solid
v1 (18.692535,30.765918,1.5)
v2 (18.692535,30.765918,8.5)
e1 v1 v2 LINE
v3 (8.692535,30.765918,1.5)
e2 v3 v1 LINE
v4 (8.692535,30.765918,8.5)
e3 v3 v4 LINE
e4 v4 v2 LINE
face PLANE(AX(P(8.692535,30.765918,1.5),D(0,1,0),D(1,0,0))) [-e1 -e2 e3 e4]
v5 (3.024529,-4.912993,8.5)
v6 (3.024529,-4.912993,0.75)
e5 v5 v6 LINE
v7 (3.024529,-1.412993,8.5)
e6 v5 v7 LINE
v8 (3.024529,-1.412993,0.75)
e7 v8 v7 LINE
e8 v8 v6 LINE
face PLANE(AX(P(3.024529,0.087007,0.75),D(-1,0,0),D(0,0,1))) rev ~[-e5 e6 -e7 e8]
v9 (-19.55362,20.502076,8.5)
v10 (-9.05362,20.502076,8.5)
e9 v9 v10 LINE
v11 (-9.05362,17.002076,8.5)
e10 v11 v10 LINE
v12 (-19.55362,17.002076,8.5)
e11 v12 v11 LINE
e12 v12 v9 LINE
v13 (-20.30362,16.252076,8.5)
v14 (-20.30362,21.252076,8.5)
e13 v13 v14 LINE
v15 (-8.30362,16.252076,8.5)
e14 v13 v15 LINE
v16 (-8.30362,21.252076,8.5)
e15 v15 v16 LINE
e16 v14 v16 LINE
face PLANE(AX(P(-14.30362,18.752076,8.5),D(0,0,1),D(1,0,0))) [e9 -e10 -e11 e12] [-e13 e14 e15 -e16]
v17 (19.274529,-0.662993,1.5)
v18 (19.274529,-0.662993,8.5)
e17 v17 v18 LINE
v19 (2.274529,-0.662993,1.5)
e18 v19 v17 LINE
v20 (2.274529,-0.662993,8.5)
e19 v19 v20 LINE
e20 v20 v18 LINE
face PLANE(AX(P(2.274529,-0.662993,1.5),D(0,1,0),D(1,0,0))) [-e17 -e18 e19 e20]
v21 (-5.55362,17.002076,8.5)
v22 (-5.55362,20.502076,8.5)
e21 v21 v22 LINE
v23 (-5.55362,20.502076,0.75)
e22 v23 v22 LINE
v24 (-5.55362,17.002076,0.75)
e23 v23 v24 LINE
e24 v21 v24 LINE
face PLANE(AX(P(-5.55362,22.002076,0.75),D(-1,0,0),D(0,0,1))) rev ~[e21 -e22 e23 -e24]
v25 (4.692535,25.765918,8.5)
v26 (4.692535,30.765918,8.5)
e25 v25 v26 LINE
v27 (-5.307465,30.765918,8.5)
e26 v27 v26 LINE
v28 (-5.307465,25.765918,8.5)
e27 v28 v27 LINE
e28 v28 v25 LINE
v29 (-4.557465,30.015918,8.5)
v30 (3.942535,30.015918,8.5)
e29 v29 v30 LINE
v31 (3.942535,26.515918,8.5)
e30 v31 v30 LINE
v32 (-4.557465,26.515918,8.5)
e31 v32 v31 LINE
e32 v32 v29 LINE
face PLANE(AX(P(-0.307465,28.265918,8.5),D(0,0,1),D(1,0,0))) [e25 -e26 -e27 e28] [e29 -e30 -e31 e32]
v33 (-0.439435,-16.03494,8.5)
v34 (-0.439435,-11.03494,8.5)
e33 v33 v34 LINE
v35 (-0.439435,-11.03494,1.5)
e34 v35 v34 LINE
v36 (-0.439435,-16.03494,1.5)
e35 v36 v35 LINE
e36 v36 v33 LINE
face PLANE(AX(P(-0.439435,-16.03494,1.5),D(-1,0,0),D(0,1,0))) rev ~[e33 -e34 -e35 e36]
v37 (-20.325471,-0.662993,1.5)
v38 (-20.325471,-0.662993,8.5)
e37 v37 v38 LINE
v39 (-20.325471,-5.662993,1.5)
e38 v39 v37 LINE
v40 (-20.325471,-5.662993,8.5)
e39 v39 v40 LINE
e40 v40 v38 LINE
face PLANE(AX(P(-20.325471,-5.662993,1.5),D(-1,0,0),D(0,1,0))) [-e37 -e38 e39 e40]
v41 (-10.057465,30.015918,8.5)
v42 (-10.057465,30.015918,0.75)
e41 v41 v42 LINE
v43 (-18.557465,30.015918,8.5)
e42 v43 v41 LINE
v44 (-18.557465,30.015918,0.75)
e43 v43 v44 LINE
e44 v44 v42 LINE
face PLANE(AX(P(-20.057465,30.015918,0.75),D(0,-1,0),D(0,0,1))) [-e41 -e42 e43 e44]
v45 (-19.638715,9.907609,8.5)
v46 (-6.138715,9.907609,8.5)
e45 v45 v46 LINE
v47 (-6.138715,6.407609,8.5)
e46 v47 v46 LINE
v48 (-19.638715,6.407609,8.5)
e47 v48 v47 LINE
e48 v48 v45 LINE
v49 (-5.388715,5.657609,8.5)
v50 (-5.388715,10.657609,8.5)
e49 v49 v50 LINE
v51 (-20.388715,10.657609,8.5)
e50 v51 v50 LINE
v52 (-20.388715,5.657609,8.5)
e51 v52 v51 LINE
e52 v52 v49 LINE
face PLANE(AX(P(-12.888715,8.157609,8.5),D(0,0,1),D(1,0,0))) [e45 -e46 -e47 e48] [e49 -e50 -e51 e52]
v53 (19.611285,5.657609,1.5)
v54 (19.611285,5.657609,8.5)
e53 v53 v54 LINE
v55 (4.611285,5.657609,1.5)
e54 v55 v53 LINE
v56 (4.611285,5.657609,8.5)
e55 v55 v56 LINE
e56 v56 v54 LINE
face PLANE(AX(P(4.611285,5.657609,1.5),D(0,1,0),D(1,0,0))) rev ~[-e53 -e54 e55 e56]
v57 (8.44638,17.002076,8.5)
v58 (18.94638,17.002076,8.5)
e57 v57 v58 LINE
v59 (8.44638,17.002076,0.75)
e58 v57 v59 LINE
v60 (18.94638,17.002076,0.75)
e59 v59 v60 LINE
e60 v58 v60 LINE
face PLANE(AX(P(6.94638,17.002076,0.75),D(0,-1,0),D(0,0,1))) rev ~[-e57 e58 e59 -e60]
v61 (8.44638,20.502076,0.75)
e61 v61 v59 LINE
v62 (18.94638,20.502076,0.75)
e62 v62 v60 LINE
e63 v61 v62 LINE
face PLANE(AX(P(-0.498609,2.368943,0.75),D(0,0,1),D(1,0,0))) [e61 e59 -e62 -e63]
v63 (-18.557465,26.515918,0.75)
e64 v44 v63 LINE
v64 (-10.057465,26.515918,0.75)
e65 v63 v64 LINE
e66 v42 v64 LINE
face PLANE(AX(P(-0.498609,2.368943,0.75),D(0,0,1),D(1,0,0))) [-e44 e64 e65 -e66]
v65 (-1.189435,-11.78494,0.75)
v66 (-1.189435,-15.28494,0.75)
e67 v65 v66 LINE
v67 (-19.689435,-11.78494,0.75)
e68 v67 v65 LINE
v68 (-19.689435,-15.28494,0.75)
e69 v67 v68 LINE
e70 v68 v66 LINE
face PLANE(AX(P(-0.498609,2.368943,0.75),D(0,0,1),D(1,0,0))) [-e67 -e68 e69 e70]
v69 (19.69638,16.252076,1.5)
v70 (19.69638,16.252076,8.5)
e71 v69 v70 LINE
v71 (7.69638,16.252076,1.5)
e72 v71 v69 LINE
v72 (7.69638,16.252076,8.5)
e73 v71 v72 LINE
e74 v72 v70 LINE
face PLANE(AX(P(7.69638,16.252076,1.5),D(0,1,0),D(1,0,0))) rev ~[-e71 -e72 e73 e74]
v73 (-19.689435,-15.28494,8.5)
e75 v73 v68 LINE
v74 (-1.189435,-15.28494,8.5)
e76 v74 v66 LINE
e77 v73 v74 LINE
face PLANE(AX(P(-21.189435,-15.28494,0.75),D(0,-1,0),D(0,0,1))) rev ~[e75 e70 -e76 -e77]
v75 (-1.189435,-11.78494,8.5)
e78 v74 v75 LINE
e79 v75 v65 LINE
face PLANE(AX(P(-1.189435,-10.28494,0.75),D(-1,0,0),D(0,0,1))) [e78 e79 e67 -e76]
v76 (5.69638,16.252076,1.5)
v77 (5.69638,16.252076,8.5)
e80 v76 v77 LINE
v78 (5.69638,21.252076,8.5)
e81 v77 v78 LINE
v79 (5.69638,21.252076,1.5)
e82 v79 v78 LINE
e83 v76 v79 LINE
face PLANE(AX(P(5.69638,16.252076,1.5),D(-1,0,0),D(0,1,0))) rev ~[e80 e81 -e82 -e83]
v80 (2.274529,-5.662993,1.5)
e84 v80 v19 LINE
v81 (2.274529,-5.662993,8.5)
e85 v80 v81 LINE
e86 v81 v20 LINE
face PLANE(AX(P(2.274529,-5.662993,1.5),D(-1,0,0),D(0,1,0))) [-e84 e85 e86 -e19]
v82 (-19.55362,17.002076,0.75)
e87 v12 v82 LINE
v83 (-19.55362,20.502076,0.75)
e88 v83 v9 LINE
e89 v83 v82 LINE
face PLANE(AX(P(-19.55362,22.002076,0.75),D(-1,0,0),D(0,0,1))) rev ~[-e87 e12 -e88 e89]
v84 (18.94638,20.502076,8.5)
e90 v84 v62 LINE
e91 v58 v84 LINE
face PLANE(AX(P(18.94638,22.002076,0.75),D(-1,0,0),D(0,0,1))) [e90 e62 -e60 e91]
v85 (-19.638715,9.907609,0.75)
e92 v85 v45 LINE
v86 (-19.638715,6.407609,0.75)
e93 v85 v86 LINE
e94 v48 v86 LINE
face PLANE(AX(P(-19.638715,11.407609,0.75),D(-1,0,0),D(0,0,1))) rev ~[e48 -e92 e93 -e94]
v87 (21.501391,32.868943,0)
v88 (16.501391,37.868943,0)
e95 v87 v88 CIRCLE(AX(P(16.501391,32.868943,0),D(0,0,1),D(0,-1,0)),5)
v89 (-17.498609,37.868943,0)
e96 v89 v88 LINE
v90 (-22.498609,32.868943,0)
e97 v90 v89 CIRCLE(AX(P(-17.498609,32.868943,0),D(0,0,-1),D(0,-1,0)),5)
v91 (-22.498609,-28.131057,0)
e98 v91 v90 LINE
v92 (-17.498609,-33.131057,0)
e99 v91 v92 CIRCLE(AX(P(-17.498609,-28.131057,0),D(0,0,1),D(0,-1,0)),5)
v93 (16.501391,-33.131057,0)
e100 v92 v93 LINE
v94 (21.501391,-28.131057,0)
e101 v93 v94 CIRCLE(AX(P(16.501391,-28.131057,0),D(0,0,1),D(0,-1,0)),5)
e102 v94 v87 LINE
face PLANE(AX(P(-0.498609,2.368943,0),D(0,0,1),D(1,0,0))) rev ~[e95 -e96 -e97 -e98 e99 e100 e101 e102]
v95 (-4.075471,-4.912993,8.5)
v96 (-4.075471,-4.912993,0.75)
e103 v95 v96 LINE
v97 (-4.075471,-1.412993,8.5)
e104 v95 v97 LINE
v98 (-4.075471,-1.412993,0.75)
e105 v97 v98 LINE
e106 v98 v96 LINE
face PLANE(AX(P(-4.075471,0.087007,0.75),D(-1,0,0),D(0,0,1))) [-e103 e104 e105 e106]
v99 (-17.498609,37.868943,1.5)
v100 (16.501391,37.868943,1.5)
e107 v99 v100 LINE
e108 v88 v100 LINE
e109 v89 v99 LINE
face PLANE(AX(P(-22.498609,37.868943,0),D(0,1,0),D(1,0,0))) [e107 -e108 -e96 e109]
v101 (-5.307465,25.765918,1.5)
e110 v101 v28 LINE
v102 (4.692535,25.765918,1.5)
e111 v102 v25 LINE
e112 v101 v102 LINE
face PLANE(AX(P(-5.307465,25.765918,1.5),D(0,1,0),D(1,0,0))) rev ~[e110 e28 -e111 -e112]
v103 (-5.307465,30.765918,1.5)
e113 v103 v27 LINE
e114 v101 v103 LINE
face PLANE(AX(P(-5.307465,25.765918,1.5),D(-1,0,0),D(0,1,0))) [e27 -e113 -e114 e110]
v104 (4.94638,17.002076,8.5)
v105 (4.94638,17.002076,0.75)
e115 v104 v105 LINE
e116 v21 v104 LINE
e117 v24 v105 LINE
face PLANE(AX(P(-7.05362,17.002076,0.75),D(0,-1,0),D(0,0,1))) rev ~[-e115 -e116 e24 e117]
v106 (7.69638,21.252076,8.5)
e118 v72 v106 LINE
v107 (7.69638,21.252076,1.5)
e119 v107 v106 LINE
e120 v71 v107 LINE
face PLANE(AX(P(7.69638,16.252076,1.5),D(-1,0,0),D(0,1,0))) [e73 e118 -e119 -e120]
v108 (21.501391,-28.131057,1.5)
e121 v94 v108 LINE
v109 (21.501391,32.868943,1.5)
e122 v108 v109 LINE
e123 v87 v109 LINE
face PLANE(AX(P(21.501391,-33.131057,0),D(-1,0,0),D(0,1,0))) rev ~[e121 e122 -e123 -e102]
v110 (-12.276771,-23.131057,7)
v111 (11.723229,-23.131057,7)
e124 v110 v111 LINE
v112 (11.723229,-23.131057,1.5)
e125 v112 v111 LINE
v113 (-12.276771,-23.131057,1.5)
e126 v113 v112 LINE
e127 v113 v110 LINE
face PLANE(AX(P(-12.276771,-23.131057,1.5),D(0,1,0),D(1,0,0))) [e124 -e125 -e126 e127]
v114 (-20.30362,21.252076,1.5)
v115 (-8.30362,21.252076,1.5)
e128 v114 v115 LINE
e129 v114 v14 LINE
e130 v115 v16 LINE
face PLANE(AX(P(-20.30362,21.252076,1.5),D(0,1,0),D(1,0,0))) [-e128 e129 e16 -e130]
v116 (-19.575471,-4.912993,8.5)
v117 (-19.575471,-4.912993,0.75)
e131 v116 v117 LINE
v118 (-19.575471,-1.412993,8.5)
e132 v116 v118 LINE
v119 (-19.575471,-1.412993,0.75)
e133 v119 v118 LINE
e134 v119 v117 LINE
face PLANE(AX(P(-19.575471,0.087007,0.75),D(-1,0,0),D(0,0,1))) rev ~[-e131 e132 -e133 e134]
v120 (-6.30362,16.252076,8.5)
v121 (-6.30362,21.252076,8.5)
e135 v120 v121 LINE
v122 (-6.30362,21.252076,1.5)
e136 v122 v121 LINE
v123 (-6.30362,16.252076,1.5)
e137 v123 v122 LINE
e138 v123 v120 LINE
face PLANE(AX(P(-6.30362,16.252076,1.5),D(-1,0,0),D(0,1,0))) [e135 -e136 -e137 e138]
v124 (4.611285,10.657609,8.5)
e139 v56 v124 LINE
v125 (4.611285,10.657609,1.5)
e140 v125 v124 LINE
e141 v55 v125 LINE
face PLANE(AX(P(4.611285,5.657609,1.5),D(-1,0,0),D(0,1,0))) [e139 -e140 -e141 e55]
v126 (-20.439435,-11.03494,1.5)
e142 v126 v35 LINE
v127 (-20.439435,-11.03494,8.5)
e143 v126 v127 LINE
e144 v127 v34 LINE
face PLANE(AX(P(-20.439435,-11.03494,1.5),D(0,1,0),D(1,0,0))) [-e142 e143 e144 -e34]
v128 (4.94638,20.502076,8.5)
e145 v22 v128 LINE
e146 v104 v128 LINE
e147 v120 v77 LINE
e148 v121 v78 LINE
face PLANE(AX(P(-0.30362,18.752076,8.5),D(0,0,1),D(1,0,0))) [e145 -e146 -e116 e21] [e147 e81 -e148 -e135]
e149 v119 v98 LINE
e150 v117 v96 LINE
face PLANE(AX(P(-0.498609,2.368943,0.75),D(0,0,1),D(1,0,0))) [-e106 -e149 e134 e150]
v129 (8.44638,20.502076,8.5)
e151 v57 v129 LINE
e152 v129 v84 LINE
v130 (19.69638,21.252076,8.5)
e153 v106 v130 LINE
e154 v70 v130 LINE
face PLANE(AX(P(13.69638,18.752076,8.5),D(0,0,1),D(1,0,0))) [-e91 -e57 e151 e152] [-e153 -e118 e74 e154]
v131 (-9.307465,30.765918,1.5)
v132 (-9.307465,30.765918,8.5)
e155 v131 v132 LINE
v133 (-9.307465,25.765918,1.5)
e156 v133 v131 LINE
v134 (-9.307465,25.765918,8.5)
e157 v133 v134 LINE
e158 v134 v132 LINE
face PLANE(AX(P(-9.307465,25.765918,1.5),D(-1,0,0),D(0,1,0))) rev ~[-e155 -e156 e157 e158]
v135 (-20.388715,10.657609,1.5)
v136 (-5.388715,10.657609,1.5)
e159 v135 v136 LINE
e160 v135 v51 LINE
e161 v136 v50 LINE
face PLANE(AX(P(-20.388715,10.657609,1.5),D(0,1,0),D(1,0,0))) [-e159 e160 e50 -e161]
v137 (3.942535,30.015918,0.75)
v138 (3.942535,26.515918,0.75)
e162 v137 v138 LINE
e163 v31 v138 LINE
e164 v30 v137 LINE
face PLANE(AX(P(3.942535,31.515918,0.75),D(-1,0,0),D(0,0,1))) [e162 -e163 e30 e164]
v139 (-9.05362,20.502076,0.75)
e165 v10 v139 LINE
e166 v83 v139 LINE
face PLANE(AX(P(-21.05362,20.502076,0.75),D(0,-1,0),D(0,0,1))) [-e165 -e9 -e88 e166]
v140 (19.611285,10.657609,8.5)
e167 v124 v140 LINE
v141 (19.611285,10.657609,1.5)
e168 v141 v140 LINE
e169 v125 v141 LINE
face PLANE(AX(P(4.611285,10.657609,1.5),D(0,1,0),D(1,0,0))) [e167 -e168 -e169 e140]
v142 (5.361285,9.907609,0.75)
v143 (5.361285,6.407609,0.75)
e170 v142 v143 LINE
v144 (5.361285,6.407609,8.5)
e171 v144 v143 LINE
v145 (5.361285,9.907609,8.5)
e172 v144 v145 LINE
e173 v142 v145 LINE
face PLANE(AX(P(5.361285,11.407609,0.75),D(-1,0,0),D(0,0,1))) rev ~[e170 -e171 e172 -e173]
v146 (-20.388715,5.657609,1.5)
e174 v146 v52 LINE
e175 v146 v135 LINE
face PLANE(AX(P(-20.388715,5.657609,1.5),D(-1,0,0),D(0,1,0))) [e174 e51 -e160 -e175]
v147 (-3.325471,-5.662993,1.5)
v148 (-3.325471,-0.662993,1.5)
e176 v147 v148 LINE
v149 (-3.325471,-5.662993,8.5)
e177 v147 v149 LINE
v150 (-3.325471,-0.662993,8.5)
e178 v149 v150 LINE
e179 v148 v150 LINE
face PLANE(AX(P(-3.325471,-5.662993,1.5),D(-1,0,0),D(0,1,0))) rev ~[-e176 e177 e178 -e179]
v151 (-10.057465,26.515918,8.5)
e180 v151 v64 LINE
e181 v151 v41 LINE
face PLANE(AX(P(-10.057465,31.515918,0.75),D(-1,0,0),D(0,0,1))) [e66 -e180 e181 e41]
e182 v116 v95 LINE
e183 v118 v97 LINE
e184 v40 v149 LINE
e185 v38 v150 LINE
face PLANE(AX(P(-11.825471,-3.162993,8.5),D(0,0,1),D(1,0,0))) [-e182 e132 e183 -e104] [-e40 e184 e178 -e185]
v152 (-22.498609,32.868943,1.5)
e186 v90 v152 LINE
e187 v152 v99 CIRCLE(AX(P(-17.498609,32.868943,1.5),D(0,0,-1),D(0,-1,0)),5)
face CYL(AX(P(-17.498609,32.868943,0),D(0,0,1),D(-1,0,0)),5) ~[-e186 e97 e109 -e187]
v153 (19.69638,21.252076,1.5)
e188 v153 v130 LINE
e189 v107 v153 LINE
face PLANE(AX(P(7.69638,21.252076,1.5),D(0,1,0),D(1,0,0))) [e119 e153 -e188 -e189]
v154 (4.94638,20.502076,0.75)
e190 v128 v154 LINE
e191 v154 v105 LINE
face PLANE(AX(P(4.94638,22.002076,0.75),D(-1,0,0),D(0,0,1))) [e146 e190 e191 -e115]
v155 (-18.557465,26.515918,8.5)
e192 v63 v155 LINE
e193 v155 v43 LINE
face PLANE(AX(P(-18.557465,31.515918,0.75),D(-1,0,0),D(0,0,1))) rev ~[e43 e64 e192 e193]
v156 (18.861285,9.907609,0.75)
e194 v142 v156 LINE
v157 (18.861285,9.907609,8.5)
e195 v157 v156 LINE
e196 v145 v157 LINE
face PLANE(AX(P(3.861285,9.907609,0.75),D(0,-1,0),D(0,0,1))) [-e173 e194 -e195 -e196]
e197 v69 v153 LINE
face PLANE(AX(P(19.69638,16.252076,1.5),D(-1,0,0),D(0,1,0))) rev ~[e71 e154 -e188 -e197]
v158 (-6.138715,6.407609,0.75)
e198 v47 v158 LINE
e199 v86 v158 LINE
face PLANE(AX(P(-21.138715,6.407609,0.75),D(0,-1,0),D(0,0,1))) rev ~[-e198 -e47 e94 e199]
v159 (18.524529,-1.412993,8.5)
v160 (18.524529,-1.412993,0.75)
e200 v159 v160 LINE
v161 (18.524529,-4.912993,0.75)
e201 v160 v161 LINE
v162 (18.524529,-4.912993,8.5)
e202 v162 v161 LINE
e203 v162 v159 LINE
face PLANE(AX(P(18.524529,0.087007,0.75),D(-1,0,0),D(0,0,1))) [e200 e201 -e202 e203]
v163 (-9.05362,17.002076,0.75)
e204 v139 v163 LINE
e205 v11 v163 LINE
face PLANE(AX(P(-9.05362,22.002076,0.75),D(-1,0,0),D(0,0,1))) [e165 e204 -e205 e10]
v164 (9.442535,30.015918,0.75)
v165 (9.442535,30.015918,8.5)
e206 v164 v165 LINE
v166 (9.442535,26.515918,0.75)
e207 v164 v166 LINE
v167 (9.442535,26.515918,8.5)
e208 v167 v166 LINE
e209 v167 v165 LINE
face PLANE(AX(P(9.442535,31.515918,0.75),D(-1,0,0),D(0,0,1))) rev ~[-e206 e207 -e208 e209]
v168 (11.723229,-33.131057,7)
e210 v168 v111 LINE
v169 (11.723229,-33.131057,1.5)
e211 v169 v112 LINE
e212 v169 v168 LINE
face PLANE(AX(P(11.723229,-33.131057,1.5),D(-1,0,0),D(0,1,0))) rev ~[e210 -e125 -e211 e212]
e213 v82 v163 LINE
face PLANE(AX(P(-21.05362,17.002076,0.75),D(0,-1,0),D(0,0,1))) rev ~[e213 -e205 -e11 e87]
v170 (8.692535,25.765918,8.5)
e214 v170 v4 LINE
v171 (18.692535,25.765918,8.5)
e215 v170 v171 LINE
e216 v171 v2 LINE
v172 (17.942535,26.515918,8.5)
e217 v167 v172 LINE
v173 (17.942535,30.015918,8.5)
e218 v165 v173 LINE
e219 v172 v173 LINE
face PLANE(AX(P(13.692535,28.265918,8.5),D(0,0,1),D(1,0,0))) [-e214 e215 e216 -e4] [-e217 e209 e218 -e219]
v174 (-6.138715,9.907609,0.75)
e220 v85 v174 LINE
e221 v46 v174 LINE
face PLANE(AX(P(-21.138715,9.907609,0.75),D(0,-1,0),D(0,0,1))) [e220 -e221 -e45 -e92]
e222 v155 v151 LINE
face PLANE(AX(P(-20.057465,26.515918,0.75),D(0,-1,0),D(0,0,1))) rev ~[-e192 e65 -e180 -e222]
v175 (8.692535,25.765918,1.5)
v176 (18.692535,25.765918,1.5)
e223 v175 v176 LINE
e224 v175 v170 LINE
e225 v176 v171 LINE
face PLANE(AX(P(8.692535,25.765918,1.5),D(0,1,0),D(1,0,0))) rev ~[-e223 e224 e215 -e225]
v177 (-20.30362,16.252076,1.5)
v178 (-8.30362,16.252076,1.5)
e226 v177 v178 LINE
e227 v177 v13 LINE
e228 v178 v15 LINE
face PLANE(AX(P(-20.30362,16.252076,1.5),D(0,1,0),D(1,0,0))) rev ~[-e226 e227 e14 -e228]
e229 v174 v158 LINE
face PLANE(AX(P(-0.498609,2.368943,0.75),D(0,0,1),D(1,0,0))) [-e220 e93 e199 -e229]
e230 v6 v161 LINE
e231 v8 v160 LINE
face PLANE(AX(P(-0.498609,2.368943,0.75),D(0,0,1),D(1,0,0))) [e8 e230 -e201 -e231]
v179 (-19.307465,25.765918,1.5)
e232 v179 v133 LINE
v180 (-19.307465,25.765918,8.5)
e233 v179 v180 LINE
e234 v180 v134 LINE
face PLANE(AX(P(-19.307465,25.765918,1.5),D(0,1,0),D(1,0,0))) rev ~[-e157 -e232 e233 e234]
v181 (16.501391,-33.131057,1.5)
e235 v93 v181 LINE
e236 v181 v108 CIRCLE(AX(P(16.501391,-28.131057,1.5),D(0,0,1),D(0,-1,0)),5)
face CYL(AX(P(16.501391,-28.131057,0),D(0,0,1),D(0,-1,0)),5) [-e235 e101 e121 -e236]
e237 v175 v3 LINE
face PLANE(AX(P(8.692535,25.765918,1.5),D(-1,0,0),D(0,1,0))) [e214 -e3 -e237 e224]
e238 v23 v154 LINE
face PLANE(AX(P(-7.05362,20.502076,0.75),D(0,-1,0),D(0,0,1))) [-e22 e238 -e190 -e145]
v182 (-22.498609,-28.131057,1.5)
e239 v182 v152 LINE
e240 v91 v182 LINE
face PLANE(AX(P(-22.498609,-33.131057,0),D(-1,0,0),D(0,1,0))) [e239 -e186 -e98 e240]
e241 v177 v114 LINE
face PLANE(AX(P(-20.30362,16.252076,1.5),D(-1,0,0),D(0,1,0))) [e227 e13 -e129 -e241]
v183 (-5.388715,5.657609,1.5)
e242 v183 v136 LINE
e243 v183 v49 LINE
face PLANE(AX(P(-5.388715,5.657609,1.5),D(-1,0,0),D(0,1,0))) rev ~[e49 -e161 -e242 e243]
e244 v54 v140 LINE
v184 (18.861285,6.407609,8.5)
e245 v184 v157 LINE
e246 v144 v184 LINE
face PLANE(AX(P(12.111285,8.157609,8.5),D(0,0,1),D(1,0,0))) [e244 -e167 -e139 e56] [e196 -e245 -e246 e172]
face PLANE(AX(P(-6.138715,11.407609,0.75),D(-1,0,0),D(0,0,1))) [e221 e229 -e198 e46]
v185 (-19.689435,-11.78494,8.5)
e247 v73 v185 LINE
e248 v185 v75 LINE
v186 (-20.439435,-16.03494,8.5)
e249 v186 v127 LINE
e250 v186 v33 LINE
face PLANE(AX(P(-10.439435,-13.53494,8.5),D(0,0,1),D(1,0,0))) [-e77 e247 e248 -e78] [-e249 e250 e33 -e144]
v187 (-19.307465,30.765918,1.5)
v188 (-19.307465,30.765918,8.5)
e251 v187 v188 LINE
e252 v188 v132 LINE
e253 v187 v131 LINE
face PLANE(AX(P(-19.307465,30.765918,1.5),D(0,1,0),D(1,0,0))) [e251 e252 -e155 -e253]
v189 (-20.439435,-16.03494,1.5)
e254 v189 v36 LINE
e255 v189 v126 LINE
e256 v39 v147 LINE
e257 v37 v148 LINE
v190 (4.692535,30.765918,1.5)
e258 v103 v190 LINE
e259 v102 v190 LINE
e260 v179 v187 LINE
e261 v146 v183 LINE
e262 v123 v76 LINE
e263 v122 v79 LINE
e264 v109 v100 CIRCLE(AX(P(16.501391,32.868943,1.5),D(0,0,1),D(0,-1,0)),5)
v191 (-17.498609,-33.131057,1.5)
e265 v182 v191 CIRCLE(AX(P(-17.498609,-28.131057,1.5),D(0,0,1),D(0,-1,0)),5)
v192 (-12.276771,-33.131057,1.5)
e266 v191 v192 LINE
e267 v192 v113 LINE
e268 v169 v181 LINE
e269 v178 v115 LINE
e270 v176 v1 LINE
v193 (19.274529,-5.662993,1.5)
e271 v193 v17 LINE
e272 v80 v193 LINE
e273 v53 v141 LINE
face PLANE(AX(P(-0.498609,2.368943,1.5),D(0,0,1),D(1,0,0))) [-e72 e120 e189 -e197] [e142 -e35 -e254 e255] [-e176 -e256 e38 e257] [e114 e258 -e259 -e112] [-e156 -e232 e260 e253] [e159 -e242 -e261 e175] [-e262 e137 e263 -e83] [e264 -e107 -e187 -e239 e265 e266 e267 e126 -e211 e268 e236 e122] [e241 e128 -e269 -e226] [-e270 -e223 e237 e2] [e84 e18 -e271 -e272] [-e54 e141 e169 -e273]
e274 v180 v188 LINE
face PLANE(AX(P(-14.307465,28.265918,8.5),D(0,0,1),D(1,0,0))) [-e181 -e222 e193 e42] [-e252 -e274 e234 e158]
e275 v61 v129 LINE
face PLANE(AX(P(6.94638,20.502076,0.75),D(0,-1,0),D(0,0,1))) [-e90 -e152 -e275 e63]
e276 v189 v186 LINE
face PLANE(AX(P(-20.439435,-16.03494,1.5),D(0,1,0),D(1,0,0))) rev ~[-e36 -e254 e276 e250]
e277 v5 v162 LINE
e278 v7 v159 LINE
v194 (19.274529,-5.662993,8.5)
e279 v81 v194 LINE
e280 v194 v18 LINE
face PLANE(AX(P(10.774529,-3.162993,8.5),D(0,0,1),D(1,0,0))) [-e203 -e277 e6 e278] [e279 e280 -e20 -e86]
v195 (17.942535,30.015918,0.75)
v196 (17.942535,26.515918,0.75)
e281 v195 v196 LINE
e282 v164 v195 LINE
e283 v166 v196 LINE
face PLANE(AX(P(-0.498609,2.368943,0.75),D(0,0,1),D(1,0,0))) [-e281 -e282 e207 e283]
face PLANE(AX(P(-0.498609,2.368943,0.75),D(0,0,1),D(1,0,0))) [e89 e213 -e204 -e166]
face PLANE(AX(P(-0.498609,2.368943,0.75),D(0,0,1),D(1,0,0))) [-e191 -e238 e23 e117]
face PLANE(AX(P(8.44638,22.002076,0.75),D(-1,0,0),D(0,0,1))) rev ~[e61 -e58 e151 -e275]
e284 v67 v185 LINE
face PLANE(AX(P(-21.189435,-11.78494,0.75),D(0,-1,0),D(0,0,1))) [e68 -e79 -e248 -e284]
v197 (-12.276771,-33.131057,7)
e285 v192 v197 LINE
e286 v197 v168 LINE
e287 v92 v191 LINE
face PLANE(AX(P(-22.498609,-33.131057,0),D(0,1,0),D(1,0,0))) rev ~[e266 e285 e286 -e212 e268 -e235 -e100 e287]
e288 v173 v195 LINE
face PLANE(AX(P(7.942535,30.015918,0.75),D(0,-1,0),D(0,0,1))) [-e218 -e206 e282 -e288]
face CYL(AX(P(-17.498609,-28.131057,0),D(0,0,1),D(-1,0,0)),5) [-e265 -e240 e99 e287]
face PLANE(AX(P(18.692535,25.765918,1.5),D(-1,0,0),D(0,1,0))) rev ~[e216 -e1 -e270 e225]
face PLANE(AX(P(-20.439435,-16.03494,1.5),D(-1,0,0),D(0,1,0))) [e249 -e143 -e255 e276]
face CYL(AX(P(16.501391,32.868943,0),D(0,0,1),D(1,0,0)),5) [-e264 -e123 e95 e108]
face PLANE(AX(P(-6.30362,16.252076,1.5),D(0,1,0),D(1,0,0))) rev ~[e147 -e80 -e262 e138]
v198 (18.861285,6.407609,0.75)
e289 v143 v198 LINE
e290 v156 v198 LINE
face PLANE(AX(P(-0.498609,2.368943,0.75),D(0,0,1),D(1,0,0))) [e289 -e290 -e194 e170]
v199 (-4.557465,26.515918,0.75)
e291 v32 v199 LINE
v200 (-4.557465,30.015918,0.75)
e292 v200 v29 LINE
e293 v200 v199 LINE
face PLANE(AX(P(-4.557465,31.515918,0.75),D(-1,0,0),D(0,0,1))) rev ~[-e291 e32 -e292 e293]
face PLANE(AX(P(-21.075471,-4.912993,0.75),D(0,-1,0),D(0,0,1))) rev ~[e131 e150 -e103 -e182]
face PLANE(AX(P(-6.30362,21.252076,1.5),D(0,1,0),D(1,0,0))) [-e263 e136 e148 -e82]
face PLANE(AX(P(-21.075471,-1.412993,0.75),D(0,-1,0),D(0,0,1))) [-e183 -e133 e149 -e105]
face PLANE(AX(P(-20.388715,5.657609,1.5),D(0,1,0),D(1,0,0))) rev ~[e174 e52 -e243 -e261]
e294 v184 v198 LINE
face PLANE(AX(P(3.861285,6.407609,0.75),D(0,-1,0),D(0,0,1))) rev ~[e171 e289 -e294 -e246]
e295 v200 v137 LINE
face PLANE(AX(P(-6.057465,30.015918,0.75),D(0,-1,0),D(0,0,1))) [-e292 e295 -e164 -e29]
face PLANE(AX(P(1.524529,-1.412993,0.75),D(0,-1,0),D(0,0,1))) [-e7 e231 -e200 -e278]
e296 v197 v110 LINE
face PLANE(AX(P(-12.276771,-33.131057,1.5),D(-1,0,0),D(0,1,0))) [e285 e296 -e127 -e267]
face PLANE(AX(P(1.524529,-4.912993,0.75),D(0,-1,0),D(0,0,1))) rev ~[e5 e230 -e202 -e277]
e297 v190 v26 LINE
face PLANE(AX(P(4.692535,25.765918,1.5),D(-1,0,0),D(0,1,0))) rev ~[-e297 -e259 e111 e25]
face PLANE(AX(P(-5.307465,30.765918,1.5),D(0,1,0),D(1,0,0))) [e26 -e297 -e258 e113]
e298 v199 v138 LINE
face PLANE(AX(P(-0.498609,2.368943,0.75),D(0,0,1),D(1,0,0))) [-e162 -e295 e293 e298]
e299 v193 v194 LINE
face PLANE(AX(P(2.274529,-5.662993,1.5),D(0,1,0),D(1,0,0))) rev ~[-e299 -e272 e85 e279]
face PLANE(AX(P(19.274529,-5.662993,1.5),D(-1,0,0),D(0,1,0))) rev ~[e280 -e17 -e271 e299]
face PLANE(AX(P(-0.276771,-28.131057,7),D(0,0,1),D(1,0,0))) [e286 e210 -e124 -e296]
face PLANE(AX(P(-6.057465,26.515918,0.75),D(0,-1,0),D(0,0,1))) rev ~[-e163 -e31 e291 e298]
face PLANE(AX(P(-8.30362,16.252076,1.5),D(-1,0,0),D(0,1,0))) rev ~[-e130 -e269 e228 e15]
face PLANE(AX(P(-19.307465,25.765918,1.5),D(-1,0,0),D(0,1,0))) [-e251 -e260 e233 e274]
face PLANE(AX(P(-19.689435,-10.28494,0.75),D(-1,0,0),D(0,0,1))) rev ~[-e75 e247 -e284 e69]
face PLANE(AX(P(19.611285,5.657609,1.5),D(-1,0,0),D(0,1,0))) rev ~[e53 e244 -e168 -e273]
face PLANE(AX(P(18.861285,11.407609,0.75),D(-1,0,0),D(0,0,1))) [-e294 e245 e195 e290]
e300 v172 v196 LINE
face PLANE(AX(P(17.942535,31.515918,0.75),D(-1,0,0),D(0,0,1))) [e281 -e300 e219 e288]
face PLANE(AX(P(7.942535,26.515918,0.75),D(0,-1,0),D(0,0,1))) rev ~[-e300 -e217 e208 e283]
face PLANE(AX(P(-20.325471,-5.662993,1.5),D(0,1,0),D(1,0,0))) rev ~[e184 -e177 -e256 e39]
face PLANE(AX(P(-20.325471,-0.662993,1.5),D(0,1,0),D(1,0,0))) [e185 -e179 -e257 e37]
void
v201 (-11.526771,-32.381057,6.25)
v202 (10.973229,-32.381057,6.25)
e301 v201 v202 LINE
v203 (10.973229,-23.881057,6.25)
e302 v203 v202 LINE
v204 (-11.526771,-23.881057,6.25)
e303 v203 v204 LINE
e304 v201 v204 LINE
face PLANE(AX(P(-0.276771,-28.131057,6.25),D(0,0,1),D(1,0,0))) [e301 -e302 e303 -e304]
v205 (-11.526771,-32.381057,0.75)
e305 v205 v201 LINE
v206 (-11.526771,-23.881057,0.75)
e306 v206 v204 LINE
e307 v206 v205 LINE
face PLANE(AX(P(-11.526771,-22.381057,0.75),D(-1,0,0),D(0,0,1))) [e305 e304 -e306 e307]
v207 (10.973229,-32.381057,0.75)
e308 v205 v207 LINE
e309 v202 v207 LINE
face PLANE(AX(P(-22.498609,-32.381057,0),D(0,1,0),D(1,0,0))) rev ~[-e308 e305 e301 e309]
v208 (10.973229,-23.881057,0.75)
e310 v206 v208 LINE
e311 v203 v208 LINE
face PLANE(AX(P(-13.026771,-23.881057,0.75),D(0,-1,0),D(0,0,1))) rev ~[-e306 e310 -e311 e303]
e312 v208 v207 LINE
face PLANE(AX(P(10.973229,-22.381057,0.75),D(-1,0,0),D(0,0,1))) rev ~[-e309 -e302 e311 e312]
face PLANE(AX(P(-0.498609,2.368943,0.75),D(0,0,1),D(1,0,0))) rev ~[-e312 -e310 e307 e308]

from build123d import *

# Parameters (mm, degrees)
F0_W         = 44
F0_H         = 71
F1_DEPTH     = 1.5
F2_R         = 5
F3_W         = 24
F3_H         = 10
F4_DEPTH     = 5.5
F5_W         = 10
F5_H         = 5
F5_W_2       = 12
F5_W_3       = 15
F5_W_4       = 17
F5_W_5       = 20
F6_DEPTH     = 7
F7_T         = 0.75
F7_T3_DEPTH  = 11.5
F7_T5_DEPTH  = 25.5
F7_T7_DEPTH  = 6.5
F7_T9_DEPTH  = 21.5
F7_T11_DEPTH = 6.5
F7_T13_DEPTH = 18.5
F7_T15_DEPTH = 18.5
F7_T17_DEPTH = 6.5
F7_T19_DEPTH = 16.5
F7_T21_DEPTH = 6.5
F7_T23_DEPTH = 13.5
F7_T25_DEPTH = 11.5
F7_T27_DEPTH = 6.5
F7_T29_DEPTH = 13.5
F7_T31_DEPTH = 16.5
F7_T33_DEPTH = 13.5
F7_T35_DEPTH = 11.5
F7_T37_DEPTH = 11.5


# Not quite as in the source:
# - a shell that OpenCascade refuses in one call is made with other operations: the cavity is built on its own and cut out


with BuildPart() as f1:
    # F0 (on Top) → F1 (new body)
    with BuildSketch(Plane.XY):
        with Locations((-0.4986094981, 2.3689430654)):
            Rectangle(F0_W, F0_H)
    extrude(amount=F1_DEPTH)

    # F2
    f2_edges = [f1.edges().sort_by_distance(p)[0] for p in [
        (-22.498609, 37.868943, 0.75),
        (-22.498609, -33.131057, 0.75),
        (21.501391, -33.131057, 0.75),
        (21.501391, 37.868943, 0.75),
    ]]
    fillet(f2_edges, radius=F2_R)

    # F3 (on face) → F4 (join)
    with BuildSketch(Plane.XY.offset(1.5)):
        with Locations((-0.276770547, -28.1310569346)):
            Rectangle(F3_W, F3_H)
    extrude(amount=F4_DEPTH)

    # F5 (on face) → F6 (join)
    with BuildSketch(Plane.XY.offset(1.5)):
        with Locations((-14.3074645847, 28.2659181952)):
            Rectangle(F5_W, F5_H)
        with Locations((-0.3074645847, 28.2659181952)):
            Rectangle(F5_W, F5_H)
        with Locations((13.6925354153, 28.2659181952)):
            Rectangle(F5_W, F5_H)
        with Locations((-14.3036200255, 18.7520762533)):
            Rectangle(F5_W_2, F5_H)
        with Locations((-0.3036200255, 18.7520762533)):
            Rectangle(F5_W_2, F5_H)
        with Locations((-12.8887149692, 8.1576090865)):
            Rectangle(F5_W_3, F5_H)
        with Locations((-11.8254707158, -3.1629925966)):
            Rectangle(F5_W_4, F5_H)
        with Locations((-10.4394350369, -13.5349402577)):
            Rectangle(F5_W_5, F5_H)
        with Locations((13.6963799745, 18.7520762533)):
            Rectangle(F5_W_2, F5_H)
        with Locations((12.1112850308, 8.1576090865)):
            Rectangle(F5_W_3, F5_H)
        with Locations((10.7745292842, -3.1629925966)):
            Rectangle(F5_W_4, F5_H)
    extrude(amount=F6_DEPTH)

    # F7: shell of thickness 0.75, made by hand


with BuildPart() as f7_core1:
    # F7_t2: copy of F1
    add(f1.part)

    # the walls: a layer under each face that stays
    f7_faces = [f7_core1.faces().sort_by_distance(p)[0] for p in [
        (-0.4986094981, -33.1310569346, 3.5),
        (-0.4986094981, 2.3689430654, 0),
        (-21.0341434041, -31.6665908405, 0.75),
        (-0.4986094981, 2.3689430654, 1.5),
        (-12.276770547, -28.1310569346, 4.25),
        (-0.276770547, -28.1310569346, 7),
        (11.723229453, -28.1310569346, 4.25),
        (20.0369244078, -31.6665908405, 0.75),
        (-22.4986094981, 2.3689430654, 0.75),
        (21.5013905019, 2.3689430654, 0.75),
        (-21.0341434041, 36.4044769713, 0.75),
        (20.0369244078, 36.4044769713, 0.75),
        (-0.4986094981, 37.8689430654, 0.75),
        (-0.276770547, -23.1310569346, 4.25),
        (-20.4394350369, -13.5349402577, 5),
        (-10.4394350369, -16.0349402577, 5),
        (-0.4394350369, -13.5349402577, 5),
        (-10.4394350369, -11.0349402577, 5),
        (-3.3254707158, -3.1629925966, 5),
        (-11.8254707158, -0.6629925966, 5),
        (-20.3254707158, -3.1629925966, 5),
        (-11.8254707158, -5.6629925966, 5),
        (19.2745292842, -3.1629925966, 5),
        (10.7745292842, -0.6629925966, 5),
        (2.2745292842, -3.1629925966, 5),
        (10.7745292842, -5.6629925966, 5),
        (-20.3887149692, 8.1576090865, 5),
        (-12.8887149692, 5.6576090865, 5),
        (-5.3887149692, 8.1576090865, 5),
        (-12.8887149692, 10.6576090865, 5),
        (-20.3036200255, 18.7520762533, 5),
        (-14.3036200255, 16.2520762533, 5),
        (-8.3036200255, 18.7520762533, 5),
        (-14.3036200255, 21.2520762533, 5),
        (-14.3074645847, 30.7659181952, 5),
        (-19.3074645847, 28.2659181952, 5),
        (-14.3074645847, 25.7659181952, 5),
        (-9.3074645847, 28.2659181952, 5),
        (-0.3036200255, 16.2520762533, 5),
        (5.6963799745, 18.7520762533, 5),
        (-0.3036200255, 21.2520762533, 5),
        (-6.3036200255, 18.7520762533, 5),
        (19.6112850308, 8.1576090865, 5),
        (12.1112850308, 10.6576090865, 5),
        (4.6112850308, 8.1576090865, 5),
        (12.1112850308, 5.6576090865, 5),
        (7.6963799745, 18.7520762533, 5),
        (13.6963799745, 16.2520762533, 5),
        (19.6963799745, 18.7520762533, 5),
        (13.6963799745, 21.2520762533, 5),
        (-0.3074645847, 25.7659181952, 5),
        (4.6925354153, 28.2659181952, 5),
        (-0.3074645847, 30.7659181952, 5),
        (-5.3074645847, 28.2659181952, 5),
        (13.6925354153, 30.7659181952, 5),
        (8.6925354153, 28.2659181952, 5),
        (13.6925354153, 25.7659181952, 5),
        (18.6925354153, 28.2659181952, 5),
    ]]
    thicken(f7_faces, amount=-F7_T, mode=Mode.SUBTRACT)

    # F7_s4 → F7_t3 (cut)
    with BuildSketch(Plane.XZ.offset(22.3810569346)):
        Polygon((-12.284270547, 1.5075), (-12.276770547, 0.75), (-11.526770547, 0.75), (-11.526770547, 1.5), align=None)
        Polygon((11.730729453, 1.5075), (11.723229453, 0.75), (10.973229453, 0.75), (10.973229453, 1.5), align=None)
    extrude(amount=F7_T3_DEPTH, mode=Mode.SUBTRACT)

    # F7_s6 → F7_t5 (cut)
    with BuildSketch(Plane.YZ.offset(-13.026770547)):
        Polygon((-23.1235569346, 1.5075), (-23.1310569346, 0.75), (-23.8810569346, 0.75), (-23.8810569346, 1.5), align=None)
    extrude(amount=F7_T5_DEPTH, mode=Mode.SUBTRACT)

    # F7_s8 → F7_t7 (cut)
    with BuildSketch(Plane.XZ.offset(10.2849402577)):
        Polygon((-20.4469350369, 1.5075), (-20.4394350369, 0.75), (-19.6894350369, 0.75), (-19.6894350369, 1.5), align=None)
        Polygon((-0.4319350369, 1.5075), (-0.4394350369, 0.75), (-1.1894350369, 0.75), (-1.1894350369, 1.5), align=None)
    extrude(amount=F7_T7_DEPTH, mode=Mode.SUBTRACT)

    # F7_s10 → F7_t9 (cut)
    with BuildSketch(Plane.YZ.offset(-21.1894350369)):
        Polygon((-16.0424402577, 1.5075), (-16.0349402577, 0.75), (-15.2849402577, 0.75), (-15.2849402577, 1.5), align=None)
        Polygon((-11.0274402577, 1.5075), (-11.0349402577, 0.75), (-11.7849402577, 0.75), (-11.7849402577, 1.5), align=None)
    extrude(amount=F7_T9_DEPTH, mode=Mode.SUBTRACT)

    # F7_s12 → F7_t11 (cut)
    with BuildSketch(Plane.XZ.offset(-0.0870074034)):
        Polygon((-3.3179707158, 1.5075), (-3.3254707158, 0.75), (-4.0754707158, 0.75), (-4.0754707158, 1.5), align=None)
        Polygon((-20.3329707158, 1.5075), (-20.3254707158, 0.75), (-19.5754707158, 0.75), (-19.5754707158, 1.5), align=None)
        Polygon((19.2820292842, 1.5075), (19.2745292842, 0.75), (18.5245292842, 0.75), (18.5245292842, 1.5), align=None)
        Polygon((2.2670292842, 1.5075), (2.2745292842, 0.75), (3.0245292842, 0.75), (3.0245292842, 1.5), align=None)
    extrude(amount=F7_T11_DEPTH, mode=Mode.SUBTRACT)

    # F7_s14 → F7_t13 (cut)
    with BuildSketch(Plane.YZ.offset(-21.0754707158)):
        Polygon((-0.6554925966, 1.5075), (-0.6629925966, 0.75), (-1.4129925966, 0.75), (-1.4129925966, 1.5), align=None)
        Polygon((-5.6704925966, 1.5075), (-5.6629925966, 0.75), (-4.9129925966, 0.75), (-4.9129925966, 1.5), align=None)
    extrude(amount=F7_T13_DEPTH, mode=Mode.SUBTRACT)

    # F7_s16 → F7_t15 (cut)
    with BuildSketch(Plane.YZ.offset(1.5245292842)):
        Polygon((-0.6554925966, 1.5075), (-0.6629925966, 0.75), (-1.4129925966, 0.75), (-1.4129925966, 1.5), align=None)
        Polygon((-5.6704925966, 1.5075), (-5.6629925966, 0.75), (-4.9129925966, 0.75), (-4.9129925966, 1.5), align=None)
    extrude(amount=F7_T15_DEPTH, mode=Mode.SUBTRACT)

    # F7_s18 → F7_t17 (cut)
    with BuildSketch(Plane.XZ.offset(-11.4076090865)):
        Polygon((-20.3962149692, 1.5075), (-20.3887149692, 0.75), (-19.6387149692, 0.75), (-19.6387149692, 1.5), align=None)
        Polygon((-5.3812149692, 1.5075), (-5.3887149692, 0.75), (-6.1387149692, 0.75), (-6.1387149692, 1.5), align=None)
        Polygon((19.6187850308, 1.5075), (19.6112850308, 0.75), (18.8612850308, 0.75), (18.8612850308, 1.5), align=None)
        Polygon((4.6037850308, 1.5075), (4.6112850308, 0.75), (5.3612850308, 0.75), (5.3612850308, 1.5), align=None)
    extrude(amount=F7_T17_DEPTH, mode=Mode.SUBTRACT)

    # F7_s20 → F7_t19 (cut)
    with BuildSketch(Plane.YZ.offset(-21.1387149692)):
        Polygon((5.6501090865, 1.5075), (5.6576090865, 0.75), (6.4076090865, 0.75), (6.4076090865, 1.5), align=None)
        Polygon((10.6651090865, 1.5075), (10.6576090865, 0.75), (9.9076090865, 0.75), (9.9076090865, 1.5), align=None)
    extrude(amount=F7_T19_DEPTH, mode=Mode.SUBTRACT)

    # F7_s22 → F7_t21 (cut)
    with BuildSketch(Plane.XZ.offset(-22.0020762533)):
        Polygon((-20.3111200255, 1.5075), (-20.3036200255, 0.75), (-19.5536200255, 0.75), (-19.5536200255, 1.5), align=None)
        Polygon((-8.2961200255, 1.5075), (-8.3036200255, 0.75), (-9.0536200255, 0.75), (-9.0536200255, 1.5), align=None)
        Polygon((5.7038799745, 1.5075), (5.6963799745, 0.75), (4.9463799745, 0.75), (4.9463799745, 1.5), align=None)
        Polygon((-6.3111200255, 1.5075), (-6.3036200255, 0.75), (-5.5536200255, 0.75), (-5.5536200255, 1.5), align=None)
        Polygon((7.6888799745, 1.5075), (7.6963799745, 0.75), (8.4463799745, 0.75), (8.4463799745, 1.5), align=None)
        Polygon((19.7038799745, 1.5075), (19.6963799745, 0.75), (18.9463799745, 0.75), (18.9463799745, 1.5), align=None)
    extrude(amount=F7_T21_DEPTH, mode=Mode.SUBTRACT)

    # F7_s24 → F7_t23 (cut)
    with BuildSketch(Plane.YZ.offset(-21.0536200255)):
        Polygon((16.2445762533, 1.5075), (16.2520762533, 0.75), (17.0020762533, 0.75), (17.0020762533, 1.5), align=None)
        Polygon((21.2595762533, 1.5075), (21.2520762533, 0.75), (20.5020762533, 0.75), (20.5020762533, 1.5), align=None)
    extrude(amount=F7_T23_DEPTH, mode=Mode.SUBTRACT)

    # F7_s26 → F7_t25 (cut)
    with BuildSketch(Plane.YZ.offset(-20.0574645847)):
        Polygon((30.7734181952, 1.5075), (30.7659181952, 0.75), (30.0159181952, 0.75), (30.0159181952, 1.5), align=None)
        Polygon((25.7584181952, 1.5075), (25.7659181952, 0.75), (26.5159181952, 0.75), (26.5159181952, 1.5), align=None)
    extrude(amount=F7_T25_DEPTH, mode=Mode.SUBTRACT)

    # F7_s28 → F7_t27 (cut)
    with BuildSketch(Plane.XZ.offset(-31.5159181952)):
        Polygon((-19.3149645847, 1.5075), (-19.3074645847, 0.75), (-18.5574645847, 0.75), (-18.5574645847, 1.5), align=None)
        Polygon((-9.2999645847, 1.5075), (-9.3074645847, 0.75), (-10.0574645847, 0.75), (-10.0574645847, 1.5), align=None)
        Polygon((4.7000354153, 1.5075), (4.6925354153, 0.75), (3.9425354153, 0.75), (3.9425354153, 1.5), align=None)
        Polygon((-5.3149645847, 1.5075), (-5.3074645847, 0.75), (-4.5574645847, 0.75), (-4.5574645847, 1.5), align=None)
        Polygon((8.6850354153, 1.5075), (8.6925354153, 0.75), (9.4425354153, 0.75), (9.4425354153, 1.5), align=None)
        Polygon((18.7000354153, 1.5075), (18.6925354153, 0.75), (17.9425354153, 0.75), (17.9425354153, 1.5), align=None)
    extrude(amount=F7_T27_DEPTH, mode=Mode.SUBTRACT)

    # F7_s30 → F7_t29 (cut)
    with BuildSketch(Plane.YZ.offset(-7.0536200255)):
        Polygon((16.2445762533, 1.5075), (16.2520762533, 0.75), (17.0020762533, 0.75), (17.0020762533, 1.5), align=None)
        Polygon((21.2595762533, 1.5075), (21.2520762533, 0.75), (20.5020762533, 0.75), (20.5020762533, 1.5), align=None)
    extrude(amount=F7_T29_DEPTH, mode=Mode.SUBTRACT)

    # F7_s32 → F7_t31 (cut)
    with BuildSketch(Plane.YZ.offset(3.8612850308)):
        Polygon((10.6651090865, 1.5075), (10.6576090865, 0.75), (9.9076090865, 0.75), (9.9076090865, 1.5), align=None)
        Polygon((5.6501090865, 1.5075), (5.6576090865, 0.75), (6.4076090865, 0.75), (6.4076090865, 1.5), align=None)
    extrude(amount=F7_T31_DEPTH, mode=Mode.SUBTRACT)

    # F7_s34 → F7_t33 (cut)
    with BuildSketch(Plane.YZ.offset(6.9463799745)):
        Polygon((16.2445762533, 1.5075), (16.2520762533, 0.75), (17.0020762533, 0.75), (17.0020762533, 1.5), align=None)
        Polygon((21.2595762533, 1.5075), (21.2520762533, 0.75), (20.5020762533, 0.75), (20.5020762533, 1.5), align=None)
    extrude(amount=F7_T33_DEPTH, mode=Mode.SUBTRACT)

    # F7_s36 → F7_t35 (cut)
    with BuildSketch(Plane.YZ.offset(-6.0574645847)):
        Polygon((25.7584181952, 1.5075), (25.7659181952, 0.75), (26.5159181952, 0.75), (26.5159181952, 1.5), align=None)
        Polygon((30.7734181952, 1.5075), (30.7659181952, 0.75), (30.0159181952, 0.75), (30.0159181952, 1.5), align=None)
    extrude(amount=F7_T35_DEPTH, mode=Mode.SUBTRACT)

    # F7_s38 → F7_t37 (cut)
    with BuildSketch(Plane.YZ.offset(7.9425354153)):
        Polygon((30.7734181952, 1.5075), (30.7659181952, 0.75), (30.0159181952, 0.75), (30.0159181952, 1.5), align=None)
        Polygon((25.7584181952, 1.5075), (25.7659181952, 0.75), (26.5159181952, 0.75), (26.5159181952, 1.5), align=None)
    extrude(amount=F7_T37_DEPTH, mode=Mode.SUBTRACT)


with BuildPart() as f1_1:
    add(f1.part)

    # what is left inside the walls is the cavity
    f7_cavity = [f7_core1.part.solids().sort_by_distance(p)[0] for p in [
        (-0.276771, -29.547724, 6.2425),
        (-7.356102, -15.27744, 4.625),
        (-9.242137, -1.420493, 4.625),
        (13.357863, -1.420493, 4.625),
        (-10.638715, 9.900109, 4.625),
        (-12.55362, 17.009576, 4.625),
        (-12.890798, 30.008418, 4.625),
        (1.44638, 17.009576, 4.625),
        (14.361285, 6.415109, 4.625),
        (15.44638, 17.009576, 4.625),
        (1.109202, 26.523418, 4.625),
        (15.109202, 30.008418, 4.625),
    ]]
    add(f7_cavity, mode=Mode.SUBTRACT)


solid = f1_1.part
